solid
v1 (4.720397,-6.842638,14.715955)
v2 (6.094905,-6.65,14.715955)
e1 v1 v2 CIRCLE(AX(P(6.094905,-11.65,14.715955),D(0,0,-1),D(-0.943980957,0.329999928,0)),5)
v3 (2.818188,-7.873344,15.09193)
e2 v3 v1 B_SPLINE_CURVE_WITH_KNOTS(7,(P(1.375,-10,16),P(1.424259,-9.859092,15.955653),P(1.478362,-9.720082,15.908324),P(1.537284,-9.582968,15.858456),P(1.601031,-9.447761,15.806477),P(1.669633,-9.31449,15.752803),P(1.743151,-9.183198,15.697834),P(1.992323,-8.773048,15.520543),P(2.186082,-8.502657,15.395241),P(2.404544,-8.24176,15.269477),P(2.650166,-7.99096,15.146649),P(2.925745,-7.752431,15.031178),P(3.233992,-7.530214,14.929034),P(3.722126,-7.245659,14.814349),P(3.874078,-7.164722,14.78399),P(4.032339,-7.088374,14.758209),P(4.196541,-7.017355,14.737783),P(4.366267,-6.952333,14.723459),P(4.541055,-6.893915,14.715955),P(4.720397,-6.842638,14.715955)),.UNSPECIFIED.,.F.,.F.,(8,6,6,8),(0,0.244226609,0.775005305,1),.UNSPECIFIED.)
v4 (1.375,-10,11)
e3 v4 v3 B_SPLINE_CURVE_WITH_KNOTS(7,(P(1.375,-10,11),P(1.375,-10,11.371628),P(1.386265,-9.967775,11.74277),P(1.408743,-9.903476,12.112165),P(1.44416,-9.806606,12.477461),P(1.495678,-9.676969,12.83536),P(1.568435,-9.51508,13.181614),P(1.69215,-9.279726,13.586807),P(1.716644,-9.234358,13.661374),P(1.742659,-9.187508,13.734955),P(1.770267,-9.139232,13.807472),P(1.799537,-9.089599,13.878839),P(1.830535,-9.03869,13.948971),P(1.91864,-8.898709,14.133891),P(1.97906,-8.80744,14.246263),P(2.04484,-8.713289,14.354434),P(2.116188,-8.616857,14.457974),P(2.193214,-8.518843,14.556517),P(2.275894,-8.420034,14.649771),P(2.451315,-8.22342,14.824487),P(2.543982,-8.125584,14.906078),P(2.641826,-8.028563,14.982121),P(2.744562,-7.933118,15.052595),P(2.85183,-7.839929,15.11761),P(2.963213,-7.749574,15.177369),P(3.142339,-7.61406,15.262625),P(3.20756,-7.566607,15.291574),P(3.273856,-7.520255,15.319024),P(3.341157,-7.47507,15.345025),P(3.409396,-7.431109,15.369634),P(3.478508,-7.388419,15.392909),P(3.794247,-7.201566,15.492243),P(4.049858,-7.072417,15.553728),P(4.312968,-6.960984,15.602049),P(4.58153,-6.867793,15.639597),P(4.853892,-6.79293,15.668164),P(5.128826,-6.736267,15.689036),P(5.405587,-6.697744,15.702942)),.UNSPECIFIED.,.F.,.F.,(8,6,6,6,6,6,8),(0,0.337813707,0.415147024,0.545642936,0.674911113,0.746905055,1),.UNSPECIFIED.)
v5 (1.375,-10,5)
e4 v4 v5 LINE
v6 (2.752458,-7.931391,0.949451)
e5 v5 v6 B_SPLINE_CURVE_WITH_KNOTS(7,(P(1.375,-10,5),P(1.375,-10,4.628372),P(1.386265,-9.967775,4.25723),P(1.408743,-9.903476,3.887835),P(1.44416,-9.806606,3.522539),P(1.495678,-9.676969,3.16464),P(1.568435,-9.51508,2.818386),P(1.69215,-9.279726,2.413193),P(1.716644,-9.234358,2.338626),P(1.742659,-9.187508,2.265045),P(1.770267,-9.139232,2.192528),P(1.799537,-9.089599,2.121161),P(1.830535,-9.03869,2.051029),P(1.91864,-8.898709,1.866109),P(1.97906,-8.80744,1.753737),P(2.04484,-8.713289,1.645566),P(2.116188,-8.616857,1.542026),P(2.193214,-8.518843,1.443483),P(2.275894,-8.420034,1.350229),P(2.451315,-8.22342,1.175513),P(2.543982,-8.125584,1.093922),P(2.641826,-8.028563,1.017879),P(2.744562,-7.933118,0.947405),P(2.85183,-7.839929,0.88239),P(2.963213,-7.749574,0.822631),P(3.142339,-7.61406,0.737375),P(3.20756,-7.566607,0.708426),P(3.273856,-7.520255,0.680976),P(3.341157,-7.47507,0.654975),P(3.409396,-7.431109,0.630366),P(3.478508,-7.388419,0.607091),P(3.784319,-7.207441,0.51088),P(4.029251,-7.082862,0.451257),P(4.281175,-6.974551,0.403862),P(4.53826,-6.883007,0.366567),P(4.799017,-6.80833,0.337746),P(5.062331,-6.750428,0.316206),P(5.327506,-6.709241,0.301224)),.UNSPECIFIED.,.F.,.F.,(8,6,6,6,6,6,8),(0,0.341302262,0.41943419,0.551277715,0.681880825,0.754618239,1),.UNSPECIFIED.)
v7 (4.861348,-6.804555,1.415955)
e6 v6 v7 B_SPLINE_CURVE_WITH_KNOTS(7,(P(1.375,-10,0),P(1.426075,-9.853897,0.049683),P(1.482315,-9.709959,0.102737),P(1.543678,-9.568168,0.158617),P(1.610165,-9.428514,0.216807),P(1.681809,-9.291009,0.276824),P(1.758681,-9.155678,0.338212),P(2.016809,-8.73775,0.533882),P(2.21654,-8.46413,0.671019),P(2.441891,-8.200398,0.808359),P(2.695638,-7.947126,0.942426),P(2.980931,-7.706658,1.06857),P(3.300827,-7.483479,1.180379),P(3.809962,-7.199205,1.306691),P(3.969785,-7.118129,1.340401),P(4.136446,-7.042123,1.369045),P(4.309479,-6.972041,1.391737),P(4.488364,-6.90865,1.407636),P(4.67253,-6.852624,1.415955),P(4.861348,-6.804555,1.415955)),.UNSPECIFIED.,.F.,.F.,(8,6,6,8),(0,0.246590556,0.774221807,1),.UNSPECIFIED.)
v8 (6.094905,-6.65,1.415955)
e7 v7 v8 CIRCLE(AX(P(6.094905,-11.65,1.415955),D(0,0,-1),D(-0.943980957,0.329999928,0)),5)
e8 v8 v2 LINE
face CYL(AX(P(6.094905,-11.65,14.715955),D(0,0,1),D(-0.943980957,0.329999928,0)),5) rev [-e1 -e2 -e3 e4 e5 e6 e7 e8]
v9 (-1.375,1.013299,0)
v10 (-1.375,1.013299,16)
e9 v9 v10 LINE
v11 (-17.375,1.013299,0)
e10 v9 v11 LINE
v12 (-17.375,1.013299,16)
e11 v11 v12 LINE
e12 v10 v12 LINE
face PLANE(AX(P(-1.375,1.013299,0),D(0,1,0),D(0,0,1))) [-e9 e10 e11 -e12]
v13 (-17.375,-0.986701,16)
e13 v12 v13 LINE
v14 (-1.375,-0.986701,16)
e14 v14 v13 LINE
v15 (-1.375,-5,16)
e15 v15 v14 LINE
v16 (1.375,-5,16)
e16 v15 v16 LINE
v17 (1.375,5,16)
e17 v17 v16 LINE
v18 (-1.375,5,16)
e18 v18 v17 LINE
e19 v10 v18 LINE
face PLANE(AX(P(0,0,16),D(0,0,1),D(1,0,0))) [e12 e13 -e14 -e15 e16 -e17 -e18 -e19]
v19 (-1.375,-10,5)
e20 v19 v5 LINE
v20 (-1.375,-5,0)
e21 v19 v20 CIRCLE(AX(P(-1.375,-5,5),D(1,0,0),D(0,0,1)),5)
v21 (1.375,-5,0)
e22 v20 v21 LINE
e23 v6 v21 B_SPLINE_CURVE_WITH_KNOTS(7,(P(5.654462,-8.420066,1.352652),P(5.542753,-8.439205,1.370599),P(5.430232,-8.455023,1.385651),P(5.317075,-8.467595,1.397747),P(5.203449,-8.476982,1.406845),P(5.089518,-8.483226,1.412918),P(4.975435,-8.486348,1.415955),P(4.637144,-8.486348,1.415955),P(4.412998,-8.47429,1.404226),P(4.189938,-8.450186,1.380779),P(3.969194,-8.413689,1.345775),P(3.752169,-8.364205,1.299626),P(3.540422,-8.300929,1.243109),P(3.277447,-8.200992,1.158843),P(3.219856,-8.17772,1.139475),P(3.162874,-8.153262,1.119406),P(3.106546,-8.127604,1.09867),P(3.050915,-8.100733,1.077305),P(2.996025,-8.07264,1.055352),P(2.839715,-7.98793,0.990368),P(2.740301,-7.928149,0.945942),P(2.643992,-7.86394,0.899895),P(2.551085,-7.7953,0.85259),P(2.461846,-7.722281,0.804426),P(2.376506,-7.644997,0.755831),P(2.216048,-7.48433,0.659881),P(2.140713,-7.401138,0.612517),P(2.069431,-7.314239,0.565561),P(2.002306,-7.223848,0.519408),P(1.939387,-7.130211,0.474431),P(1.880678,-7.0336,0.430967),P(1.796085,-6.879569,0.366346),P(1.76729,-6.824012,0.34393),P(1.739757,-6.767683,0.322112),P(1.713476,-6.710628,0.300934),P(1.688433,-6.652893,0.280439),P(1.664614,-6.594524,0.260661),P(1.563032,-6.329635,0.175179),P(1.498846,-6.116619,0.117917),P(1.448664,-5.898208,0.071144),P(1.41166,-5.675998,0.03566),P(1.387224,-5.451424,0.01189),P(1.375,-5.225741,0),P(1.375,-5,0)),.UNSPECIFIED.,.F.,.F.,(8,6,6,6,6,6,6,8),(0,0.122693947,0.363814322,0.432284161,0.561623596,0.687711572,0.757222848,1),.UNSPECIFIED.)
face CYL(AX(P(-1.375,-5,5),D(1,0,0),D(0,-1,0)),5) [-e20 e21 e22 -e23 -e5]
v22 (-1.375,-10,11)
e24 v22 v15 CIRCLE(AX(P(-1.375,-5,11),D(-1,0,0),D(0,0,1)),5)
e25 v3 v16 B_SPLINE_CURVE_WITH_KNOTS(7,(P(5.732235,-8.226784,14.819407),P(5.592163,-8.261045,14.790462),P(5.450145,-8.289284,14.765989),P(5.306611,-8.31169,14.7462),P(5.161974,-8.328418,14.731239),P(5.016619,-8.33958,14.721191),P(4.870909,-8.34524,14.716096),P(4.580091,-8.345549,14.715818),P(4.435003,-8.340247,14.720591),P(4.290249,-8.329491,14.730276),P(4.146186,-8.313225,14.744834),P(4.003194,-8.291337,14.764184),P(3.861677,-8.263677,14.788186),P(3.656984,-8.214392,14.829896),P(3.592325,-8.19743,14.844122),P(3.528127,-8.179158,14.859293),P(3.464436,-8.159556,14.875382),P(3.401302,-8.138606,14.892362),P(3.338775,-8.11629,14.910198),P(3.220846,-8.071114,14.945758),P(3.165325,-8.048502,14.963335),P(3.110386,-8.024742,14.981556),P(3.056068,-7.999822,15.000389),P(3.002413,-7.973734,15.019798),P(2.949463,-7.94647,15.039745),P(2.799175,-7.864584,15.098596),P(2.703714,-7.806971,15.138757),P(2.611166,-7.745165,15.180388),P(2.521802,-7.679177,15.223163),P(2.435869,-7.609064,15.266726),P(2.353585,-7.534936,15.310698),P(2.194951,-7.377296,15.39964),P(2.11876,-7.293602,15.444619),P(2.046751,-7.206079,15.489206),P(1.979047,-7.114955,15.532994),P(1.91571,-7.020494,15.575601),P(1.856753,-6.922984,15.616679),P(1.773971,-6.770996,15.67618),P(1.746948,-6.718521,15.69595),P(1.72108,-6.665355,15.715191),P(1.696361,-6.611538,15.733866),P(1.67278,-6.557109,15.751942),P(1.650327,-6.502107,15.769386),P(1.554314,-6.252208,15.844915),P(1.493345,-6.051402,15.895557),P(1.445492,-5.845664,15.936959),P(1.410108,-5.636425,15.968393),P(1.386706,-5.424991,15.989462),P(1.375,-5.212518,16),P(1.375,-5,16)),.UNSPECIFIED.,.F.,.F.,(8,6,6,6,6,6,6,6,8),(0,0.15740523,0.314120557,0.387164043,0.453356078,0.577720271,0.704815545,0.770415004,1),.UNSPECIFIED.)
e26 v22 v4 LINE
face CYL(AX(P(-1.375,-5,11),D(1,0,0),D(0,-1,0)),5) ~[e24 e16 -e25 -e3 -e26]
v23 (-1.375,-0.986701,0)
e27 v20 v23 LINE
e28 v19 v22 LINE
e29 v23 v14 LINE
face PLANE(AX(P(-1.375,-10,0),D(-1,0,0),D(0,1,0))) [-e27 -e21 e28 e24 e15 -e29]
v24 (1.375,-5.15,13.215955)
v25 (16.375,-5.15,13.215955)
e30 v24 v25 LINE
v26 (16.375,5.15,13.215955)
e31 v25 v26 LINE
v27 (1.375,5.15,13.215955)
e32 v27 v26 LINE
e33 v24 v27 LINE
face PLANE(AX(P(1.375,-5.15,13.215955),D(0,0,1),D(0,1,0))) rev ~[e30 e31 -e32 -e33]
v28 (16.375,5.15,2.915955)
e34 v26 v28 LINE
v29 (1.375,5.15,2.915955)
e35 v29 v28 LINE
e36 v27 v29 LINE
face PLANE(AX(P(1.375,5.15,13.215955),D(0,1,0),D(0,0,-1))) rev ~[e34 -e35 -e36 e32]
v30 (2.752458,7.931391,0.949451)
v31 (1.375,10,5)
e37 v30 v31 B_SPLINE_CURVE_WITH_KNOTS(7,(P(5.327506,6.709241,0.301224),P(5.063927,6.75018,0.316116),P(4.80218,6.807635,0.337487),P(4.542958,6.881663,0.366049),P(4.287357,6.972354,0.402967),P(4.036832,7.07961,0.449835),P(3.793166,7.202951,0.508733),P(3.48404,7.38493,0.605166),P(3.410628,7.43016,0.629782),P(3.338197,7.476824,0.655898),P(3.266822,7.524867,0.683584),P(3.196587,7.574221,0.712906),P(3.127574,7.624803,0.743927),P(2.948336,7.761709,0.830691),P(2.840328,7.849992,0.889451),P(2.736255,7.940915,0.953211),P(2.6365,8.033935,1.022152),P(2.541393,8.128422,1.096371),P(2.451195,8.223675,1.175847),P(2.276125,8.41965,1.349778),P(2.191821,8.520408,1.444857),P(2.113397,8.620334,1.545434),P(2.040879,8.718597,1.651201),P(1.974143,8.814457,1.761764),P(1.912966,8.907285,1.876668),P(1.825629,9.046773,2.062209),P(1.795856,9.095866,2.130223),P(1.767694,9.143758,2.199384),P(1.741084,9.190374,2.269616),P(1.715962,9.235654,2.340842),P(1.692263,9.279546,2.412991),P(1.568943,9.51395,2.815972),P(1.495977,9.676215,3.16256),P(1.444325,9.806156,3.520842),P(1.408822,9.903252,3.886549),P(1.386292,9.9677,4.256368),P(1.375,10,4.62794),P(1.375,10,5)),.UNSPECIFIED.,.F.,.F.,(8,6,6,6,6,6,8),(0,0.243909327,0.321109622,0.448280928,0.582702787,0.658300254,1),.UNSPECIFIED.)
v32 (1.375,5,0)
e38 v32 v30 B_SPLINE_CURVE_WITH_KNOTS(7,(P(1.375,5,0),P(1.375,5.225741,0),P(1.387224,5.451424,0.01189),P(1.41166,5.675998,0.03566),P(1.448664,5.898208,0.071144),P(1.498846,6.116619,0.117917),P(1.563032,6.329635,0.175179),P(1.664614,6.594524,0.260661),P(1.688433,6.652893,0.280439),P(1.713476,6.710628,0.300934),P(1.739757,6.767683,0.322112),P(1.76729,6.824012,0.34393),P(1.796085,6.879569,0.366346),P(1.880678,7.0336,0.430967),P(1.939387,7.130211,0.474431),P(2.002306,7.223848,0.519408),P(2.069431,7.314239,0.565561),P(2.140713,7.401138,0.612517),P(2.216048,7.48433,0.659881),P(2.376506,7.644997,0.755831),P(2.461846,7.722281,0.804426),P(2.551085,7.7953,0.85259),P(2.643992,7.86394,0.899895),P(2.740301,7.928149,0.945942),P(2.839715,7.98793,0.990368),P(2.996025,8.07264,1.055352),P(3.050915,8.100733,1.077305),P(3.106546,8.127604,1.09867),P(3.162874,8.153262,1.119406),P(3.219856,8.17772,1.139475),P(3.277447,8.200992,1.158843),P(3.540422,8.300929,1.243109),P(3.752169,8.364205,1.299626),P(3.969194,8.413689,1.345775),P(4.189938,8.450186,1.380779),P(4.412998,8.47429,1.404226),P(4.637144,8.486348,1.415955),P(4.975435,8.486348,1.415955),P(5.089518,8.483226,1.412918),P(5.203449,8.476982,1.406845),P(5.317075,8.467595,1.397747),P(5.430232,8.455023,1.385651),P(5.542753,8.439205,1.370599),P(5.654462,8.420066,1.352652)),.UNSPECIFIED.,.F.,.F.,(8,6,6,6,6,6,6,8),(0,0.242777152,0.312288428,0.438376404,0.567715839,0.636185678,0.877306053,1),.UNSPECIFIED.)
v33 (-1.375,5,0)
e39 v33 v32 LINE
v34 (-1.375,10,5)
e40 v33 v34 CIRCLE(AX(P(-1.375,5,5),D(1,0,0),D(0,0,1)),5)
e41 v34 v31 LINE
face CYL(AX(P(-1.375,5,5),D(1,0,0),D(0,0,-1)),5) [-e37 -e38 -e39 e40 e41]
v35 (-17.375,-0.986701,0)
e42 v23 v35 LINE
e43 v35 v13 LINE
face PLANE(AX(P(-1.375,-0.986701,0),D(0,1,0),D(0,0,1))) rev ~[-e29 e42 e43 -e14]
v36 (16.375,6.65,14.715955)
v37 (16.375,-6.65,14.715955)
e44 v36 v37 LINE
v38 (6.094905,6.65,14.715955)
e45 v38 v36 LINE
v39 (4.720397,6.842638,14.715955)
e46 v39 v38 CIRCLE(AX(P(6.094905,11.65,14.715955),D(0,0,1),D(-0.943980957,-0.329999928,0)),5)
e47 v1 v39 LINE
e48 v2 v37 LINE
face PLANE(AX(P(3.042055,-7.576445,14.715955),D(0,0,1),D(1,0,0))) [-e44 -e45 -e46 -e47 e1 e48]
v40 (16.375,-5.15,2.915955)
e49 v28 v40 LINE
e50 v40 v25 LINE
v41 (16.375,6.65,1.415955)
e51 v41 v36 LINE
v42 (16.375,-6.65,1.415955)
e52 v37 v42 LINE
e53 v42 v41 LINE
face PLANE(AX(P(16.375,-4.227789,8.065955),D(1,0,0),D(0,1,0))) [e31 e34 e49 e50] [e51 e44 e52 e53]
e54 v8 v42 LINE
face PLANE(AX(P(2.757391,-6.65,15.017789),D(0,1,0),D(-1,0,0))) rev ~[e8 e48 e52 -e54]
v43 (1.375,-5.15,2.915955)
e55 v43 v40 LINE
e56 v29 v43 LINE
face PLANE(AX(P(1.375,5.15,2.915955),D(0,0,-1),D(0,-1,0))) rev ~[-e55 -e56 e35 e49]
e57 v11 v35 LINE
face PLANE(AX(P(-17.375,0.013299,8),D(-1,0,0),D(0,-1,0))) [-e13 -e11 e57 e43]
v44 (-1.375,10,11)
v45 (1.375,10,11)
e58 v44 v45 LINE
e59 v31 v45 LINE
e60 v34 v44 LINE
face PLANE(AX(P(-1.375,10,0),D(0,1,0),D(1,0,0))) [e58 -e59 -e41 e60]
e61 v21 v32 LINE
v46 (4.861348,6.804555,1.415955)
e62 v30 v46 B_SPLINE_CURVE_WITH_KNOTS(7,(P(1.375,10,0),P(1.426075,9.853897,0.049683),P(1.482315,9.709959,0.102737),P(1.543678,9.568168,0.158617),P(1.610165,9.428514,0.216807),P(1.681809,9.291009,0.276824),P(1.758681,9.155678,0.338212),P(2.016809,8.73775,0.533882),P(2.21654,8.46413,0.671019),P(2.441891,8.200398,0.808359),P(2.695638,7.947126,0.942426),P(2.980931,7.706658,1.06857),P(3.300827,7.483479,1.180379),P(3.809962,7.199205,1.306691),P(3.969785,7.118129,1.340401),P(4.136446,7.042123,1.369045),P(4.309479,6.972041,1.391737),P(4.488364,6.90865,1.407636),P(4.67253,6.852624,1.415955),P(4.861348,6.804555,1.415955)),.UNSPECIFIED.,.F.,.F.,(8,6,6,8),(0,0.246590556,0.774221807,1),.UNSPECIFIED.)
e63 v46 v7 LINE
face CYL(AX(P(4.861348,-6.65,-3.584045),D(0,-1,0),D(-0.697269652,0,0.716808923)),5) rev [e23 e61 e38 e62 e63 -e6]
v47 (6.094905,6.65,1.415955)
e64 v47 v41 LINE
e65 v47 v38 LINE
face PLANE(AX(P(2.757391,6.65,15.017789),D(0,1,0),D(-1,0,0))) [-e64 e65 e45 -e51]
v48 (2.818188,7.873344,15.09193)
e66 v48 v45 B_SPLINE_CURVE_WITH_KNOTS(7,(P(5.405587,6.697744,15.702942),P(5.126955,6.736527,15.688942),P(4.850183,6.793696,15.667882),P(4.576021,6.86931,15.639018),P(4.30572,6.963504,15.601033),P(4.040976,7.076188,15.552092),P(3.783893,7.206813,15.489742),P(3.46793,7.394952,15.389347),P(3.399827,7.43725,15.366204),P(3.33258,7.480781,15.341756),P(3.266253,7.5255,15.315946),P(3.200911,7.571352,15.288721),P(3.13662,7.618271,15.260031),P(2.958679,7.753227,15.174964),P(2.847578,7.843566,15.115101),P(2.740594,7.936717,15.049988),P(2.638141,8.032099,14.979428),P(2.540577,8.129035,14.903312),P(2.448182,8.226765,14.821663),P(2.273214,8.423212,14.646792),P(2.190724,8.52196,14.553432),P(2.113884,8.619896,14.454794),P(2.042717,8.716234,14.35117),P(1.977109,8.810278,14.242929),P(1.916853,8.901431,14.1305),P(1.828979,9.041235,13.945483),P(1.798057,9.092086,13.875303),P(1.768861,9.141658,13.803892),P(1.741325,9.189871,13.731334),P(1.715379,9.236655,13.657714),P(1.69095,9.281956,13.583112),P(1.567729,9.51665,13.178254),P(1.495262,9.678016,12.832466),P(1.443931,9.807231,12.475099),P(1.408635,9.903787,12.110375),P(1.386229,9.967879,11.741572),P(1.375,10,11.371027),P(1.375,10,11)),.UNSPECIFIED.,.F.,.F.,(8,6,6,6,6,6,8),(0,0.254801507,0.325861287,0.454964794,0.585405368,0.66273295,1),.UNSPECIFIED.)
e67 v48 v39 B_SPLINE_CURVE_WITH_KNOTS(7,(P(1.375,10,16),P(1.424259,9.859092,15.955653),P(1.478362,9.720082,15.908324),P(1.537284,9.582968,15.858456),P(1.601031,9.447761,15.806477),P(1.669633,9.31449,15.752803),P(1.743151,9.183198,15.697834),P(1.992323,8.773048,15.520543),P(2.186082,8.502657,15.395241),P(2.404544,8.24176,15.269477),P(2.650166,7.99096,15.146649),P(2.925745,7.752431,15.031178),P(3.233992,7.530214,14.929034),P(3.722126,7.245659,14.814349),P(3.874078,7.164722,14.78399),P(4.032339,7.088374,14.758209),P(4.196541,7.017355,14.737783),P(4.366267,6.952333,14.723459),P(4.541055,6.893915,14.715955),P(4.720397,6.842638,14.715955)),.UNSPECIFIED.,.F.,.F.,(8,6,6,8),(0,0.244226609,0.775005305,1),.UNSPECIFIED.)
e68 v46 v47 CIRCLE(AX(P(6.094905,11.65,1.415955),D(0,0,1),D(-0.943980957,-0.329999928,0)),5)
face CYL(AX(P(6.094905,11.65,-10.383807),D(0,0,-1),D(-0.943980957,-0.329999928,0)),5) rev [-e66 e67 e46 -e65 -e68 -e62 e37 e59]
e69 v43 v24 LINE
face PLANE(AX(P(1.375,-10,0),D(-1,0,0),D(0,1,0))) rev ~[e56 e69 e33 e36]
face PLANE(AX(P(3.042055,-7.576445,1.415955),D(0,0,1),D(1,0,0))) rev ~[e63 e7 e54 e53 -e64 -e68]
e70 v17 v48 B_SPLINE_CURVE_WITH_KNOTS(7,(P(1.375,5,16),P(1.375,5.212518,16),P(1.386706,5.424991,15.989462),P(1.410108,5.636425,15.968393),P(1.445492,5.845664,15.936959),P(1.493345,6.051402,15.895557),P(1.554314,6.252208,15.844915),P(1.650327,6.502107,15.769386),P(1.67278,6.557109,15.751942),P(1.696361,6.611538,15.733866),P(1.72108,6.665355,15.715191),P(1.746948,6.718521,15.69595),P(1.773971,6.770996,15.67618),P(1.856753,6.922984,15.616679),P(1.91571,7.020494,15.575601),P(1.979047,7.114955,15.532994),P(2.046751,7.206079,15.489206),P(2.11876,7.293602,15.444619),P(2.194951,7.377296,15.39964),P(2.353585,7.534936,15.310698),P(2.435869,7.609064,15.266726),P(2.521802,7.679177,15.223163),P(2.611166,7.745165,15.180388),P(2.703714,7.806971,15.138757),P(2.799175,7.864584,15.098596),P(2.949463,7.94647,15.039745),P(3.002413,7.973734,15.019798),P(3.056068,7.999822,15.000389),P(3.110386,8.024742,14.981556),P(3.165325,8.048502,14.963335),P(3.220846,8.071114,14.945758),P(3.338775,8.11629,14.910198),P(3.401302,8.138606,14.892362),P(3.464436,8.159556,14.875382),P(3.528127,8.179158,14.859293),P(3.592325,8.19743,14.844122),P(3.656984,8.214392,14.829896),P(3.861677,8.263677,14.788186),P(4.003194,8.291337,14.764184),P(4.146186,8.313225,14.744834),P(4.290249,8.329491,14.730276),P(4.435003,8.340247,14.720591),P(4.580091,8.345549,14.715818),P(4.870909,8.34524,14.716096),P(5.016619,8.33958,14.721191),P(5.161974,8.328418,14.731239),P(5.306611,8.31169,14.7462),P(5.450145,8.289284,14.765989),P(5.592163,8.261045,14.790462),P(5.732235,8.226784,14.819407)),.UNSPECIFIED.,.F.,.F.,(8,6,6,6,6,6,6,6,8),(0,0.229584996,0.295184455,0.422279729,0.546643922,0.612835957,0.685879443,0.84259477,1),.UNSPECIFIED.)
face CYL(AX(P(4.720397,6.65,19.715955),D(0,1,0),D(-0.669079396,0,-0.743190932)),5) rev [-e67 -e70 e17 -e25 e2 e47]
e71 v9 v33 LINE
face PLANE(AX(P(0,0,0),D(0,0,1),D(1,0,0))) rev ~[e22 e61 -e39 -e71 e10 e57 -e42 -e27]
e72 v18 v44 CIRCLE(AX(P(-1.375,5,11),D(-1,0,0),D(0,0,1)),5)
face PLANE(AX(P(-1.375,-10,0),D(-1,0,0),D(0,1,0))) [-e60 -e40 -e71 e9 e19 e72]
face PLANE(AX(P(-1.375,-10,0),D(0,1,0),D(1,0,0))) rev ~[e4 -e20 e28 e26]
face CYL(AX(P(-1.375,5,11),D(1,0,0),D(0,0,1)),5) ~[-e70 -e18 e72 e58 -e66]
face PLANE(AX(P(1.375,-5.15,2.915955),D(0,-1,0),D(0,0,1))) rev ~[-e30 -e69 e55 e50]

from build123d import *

# Parameters (mm, degrees)
F0_W         = 2.75
F0_H         = 20
F1_DEPTH     = 16
F2_W         = 5.15
F2_H         = 10.3
F3_DEPTH     = 2.75
F4_DEPTH     = 15
F5_T1_DEPTH  = 13.2999992773
F5_T3_DEPTH  = 13.2999992773
F5_T9_DEPTH  = 21.6634917276
F5_T14_DEPTH = 25.0997612432
F5_T22_DEPTH = 21.6634917276
F5_T27_DEPTH = 25.0997612432
F5_T35_DEPTH = 22.0158699277
F5_T40_DEPTH = 25.0997612432
F5_T48_DEPTH = 25.0997612432
F5_T53_DEPTH = 22.0158699277
F6_R         = 5
F7_W         = 2
F7_H         = 16
F8_DEPTH     = 16


# Not quite as in the source:
# - a fillet or chamfer that OpenCascade refuses, or shapes differently, is made with other operations: its cross-section is extruded or revolved along the edge and cut away or added
# - a feature names something its author has since deleted; it is built from what else it names


with BuildPart() as f1:
    # F0 (on Top) → F1 (new body)
    with BuildSketch(Plane.XY):
        Rectangle(F0_W, F0_H)
    extrude(amount=F1_DEPTH)

    # F2 (on face) → F3 (join)
    with BuildSketch(Plane.YZ.offset(1.375)):
        Polygon((0, 16), (-10, 16), (-10, 0), (0, 0), (0, 1.4159553841), (-6.6499996386, 1.4159553841), (-6.6499996386, 14.7159546614), (0, 14.7159546614), align=None)
        Polygon((10, 16), (0, 16), (0, 14.7159546614), (6.6499996386, 14.7159546614), (6.6499996386, 1.4159553841), (0, 1.4159553841), (0, 0), (10, 0), align=None)
        with Locations((-2.575, 8.0659550227)):
            Rectangle(F2_W, F2_H)
        with Locations((2.575, 8.0659550227)):
            Rectangle(F2_W, F2_H)
        Polygon((0, 13.2159550227), (0, 14.7159546614), (-6.6499996386, 14.7159546614), (-6.6499996386, 1.4159553841), (0, 1.4159553841), (0, 2.9159550227), (-5.15, 2.9159550227), (-5.15, 13.2159550227), align=None)
        Polygon((6.6499996386, 14.7159546614), (0, 14.7159546614), (0, 13.2159550227), (5.15, 13.2159550227), (5.15, 2.9159550227), (0, 2.9159550227), (0, 1.4159553841), (6.6499996386, 1.4159553841), align=None)
    extrude(amount=-F3_DEPTH)

    # F2 (on face) → F4 (join)
    with BuildSketch(Plane.YZ.offset(1.375)):
        Polygon((0, 13.2159550227), (0, 14.7159546614), (-6.6499996386, 14.7159546614), (-6.6499996386, 1.4159553841), (0, 1.4159553841), (0, 2.9159550227), (-5.15, 2.9159550227), (-5.15, 13.2159550227), align=None)
        Polygon((6.6499996386, 14.7159546614), (0, 14.7159546614), (0, 13.2159550227), (5.15, 13.2159550227), (5.15, 2.9159550227), (0, 2.9159550227), (0, 1.4159553841), (6.6499996386, 1.4159553841), align=None)
    extrude(amount=F4_DEPTH)

    # F5: fillet of radius 5 on 6 edges, made by hand

    # F5_s2 → F5_t1 (join)
    with BuildSketch(Plane.XZ.offset(-6.6499996386)):
        with BuildLine():
            ThreePointArc((1.375, 16), (2.9287180617, 15.0479907955), (4.7203969801, 14.7159546614))
            Line((4.7203969801, 14.7159546614), (1.375, 14.7159546614))
            Line((1.375, 14.7159546614), (1.375, 16))
        make_face()
        with BuildLine():
            ThreePointArc((1.375, 0), (2.9798891295, 1.0484613517), (4.8613482602, 1.4159553841))
            Line((4.8613482602, 1.4159553841), (1.375, 1.4159553841))
            Line((1.375, 1.4159553841), (1.375, 0))
        make_face()
    extrude(amount=F5_T1_DEPTH)

    # F5_s4 → F5_t3 (join)
    with BuildSketch(Plane.XY.offset(1.4159553841)):
        with BuildLine():
            ThreePointArc((1.375, -10), (3.2009454046, -7.5726231419), (6.0949047864, -6.6499996386))
            Line((6.0949047864, -6.6499996386), (1.375, -6.6499996386))
            Line((1.375, -6.6499996386), (1.375, -10))
        make_face()
        with BuildLine():
            ThreePointArc((1.375, 10), (3.2009454046, 7.5726231419), (6.0949047864, 6.6499996386))
            Line((6.0949047864, 6.6499996386), (1.375, 6.6499996386))
            Line((1.375, 6.6499996386), (1.375, 10))
        make_face()
    extrude(amount=F5_T3_DEPTH)


with BuildPart() as f5_tool7:
    # F5_s8 → F5_t9 (new body)
    with BuildSketch(Plane.XZ.offset(-15.013492089)):
        with BuildLine():
            ThreePointArc((1.375, 16), (2.9287180617, 15.0479907955), (4.7203969801, 14.7159546614))
            Line((4.7203969801, 14.7159546614), (1.375, 14.7159546614))
            Line((1.375, 14.7159546614), (1.375, 16))
        make_face()
    extrude(amount=F5_T9_DEPTH)

    split(bisect_by=Plane.XZ.offset(-10), keep=Keep.TOP)

    split(bisect_by=Plane.XZ.offset(-6.6499996386), keep=Keep.BOTTOM)


with BuildPart() as f5_tool12:
    # F5_s13 → F5_t14 (new body)
    with BuildSketch(Plane.XY.offset(1.4159553841)):
        with BuildLine():
            ThreePointArc((1.375, 10), (3.2009454046, 7.5726231419), (6.0949047864, 6.6499996386))
            Line((6.0949047864, 6.6499996386), (1.375, 6.6499996386))
            Line((1.375, 6.6499996386), (1.375, 10))
        make_face()
    extrude(amount=F5_T14_DEPTH)

    split(bisect_by=Plane.XY.offset(16), keep=Keep.BOTTOM)

    split(bisect_by=Plane.XY.offset(14.7159546614), keep=Keep.TOP)


with BuildPart() as f5_tool7_1:
    add(f5_tool7.part)

    # F5_t17: intersect F5_tool12
    add(f5_tool12.part, mode=Mode.INTERSECT)


with BuildPart() as f1_1:
    add(f1.part)

    # F5_t5: union F5_tool7
    add(f5_tool7_1.part)


with BuildPart() as f5_tool20:
    # F5_s21 → F5_t22 (new body)
    with BuildSketch(Plane.XZ.offset(-6.6499996386)):
        with BuildLine():
            ThreePointArc((1.375, 16), (2.9287180617, 15.0479907955), (4.7203969801, 14.7159546614))
            Line((4.7203969801, 14.7159546614), (1.375, 14.7159546614))
            Line((1.375, 14.7159546614), (1.375, 16))
        make_face()
    extrude(amount=F5_T22_DEPTH)

    split(bisect_by=Plane.XZ.offset(10), keep=Keep.BOTTOM)

    split(bisect_by=Plane.XZ.offset(6.6499996386), keep=Keep.TOP)


with BuildPart() as f5_tool25:
    # F5_s26 → F5_t27 (new body)
    with BuildSketch(Plane.XY.offset(26.5157166273)):
        with BuildLine():
            ThreePointArc((1.375, -10), (3.2009454046, -7.5726231419), (6.0949047864, -6.6499996386))
            Line((6.0949047864, -6.6499996386), (1.375, -6.6499996386))
            Line((1.375, -6.6499996386), (1.375, -10))
        make_face()
    extrude(amount=-F5_T27_DEPTH)

    split(bisect_by=Plane.XY.offset(16), keep=Keep.BOTTOM)

    split(bisect_by=Plane.XY.offset(14.7159546614), keep=Keep.TOP)


with BuildPart() as f5_tool20_1:
    add(f5_tool20.part)

    # F5_t30: intersect F5_tool25
    add(f5_tool25.part, mode=Mode.INTERSECT)


with BuildPart() as f1_2:
    add(f1_1.part)

    # F5_t18: union F5_tool20
    add(f5_tool20_1.part)


with BuildPart() as f5_tool33:
    # F5_s34 → F5_t35 (new body)
    with BuildSketch(Plane.XZ.offset(15.365870289)):
        with BuildLine():
            ThreePointArc((1.375, 0), (2.9798891295, 1.0484613517), (4.8613482602, 1.4159553841))
            Line((4.8613482602, 1.4159553841), (1.375, 1.4159553841))
            Line((1.375, 1.4159553841), (1.375, 0))
        make_face()
    extrude(amount=-F5_T35_DEPTH)

    split(bisect_by=Plane.XZ.offset(10), keep=Keep.BOTTOM)

    split(bisect_by=Plane.XZ.offset(6.6499996386), keep=Keep.TOP)


with BuildPart() as f5_tool38:
    # F5_s39 → F5_t40 (new body)
    with BuildSketch(Plane.XY.offset(14.7159546614)):
        with BuildLine():
            ThreePointArc((1.375, -10), (3.2009454046, -7.5726231419), (6.0949047864, -6.6499996386))
            Line((6.0949047864, -6.6499996386), (1.375, -6.6499996386))
            Line((1.375, -6.6499996386), (1.375, -10))
        make_face()
    extrude(amount=-F5_T40_DEPTH)

    split(bisect_by=Plane.XY, keep=Keep.TOP)

    split(bisect_by=Plane.XY.offset(1.4159553841), keep=Keep.BOTTOM)


with BuildPart() as f5_tool33_1:
    add(f5_tool33.part)

    # F5_t43: intersect F5_tool38
    add(f5_tool38.part, mode=Mode.INTERSECT)


with BuildPart() as f1_3:
    add(f1_2.part)

    # F5_t31: union F5_tool33
    add(f5_tool33_1.part)


with BuildPart() as f5_tool46:
    # F5_s47 → F5_t48 (new body)
    with BuildSketch(Plane.XY.offset(-10.3838065819)):
        with BuildLine():
            ThreePointArc((1.375, 10), (3.2009454046, 7.5726231419), (6.0949047864, 6.6499996386))
            Line((6.0949047864, 6.6499996386), (1.375, 6.6499996386))
            Line((1.375, 6.6499996386), (1.375, 10))
        make_face()
    extrude(amount=F5_T48_DEPTH)

    split(bisect_by=Plane.XY, keep=Keep.TOP)

    split(bisect_by=Plane.XY.offset(1.4159553841), keep=Keep.BOTTOM)


with BuildPart() as f5_tool51:
    # F5_s52 → F5_t53 (new body)
    with BuildSketch(Plane.XZ.offset(6.6499996386)):
        with BuildLine():
            ThreePointArc((1.375, 0), (2.9798891295, 1.0484613517), (4.8613482602, 1.4159553841))
            Line((4.8613482602, 1.4159553841), (1.375, 1.4159553841))
            Line((1.375, 1.4159553841), (1.375, 0))
        make_face()
    extrude(amount=-F5_T53_DEPTH)

    split(bisect_by=Plane.XZ.offset(-10), keep=Keep.TOP)

    split(bisect_by=Plane.XZ.offset(-6.6499996386), keep=Keep.BOTTOM)


with BuildPart() as f5_tool46_1:
    add(f5_tool46.part)

    # F5_t56: intersect F5_tool51
    add(f5_tool51.part, mode=Mode.INTERSECT)


with BuildPart() as f1_4:
    add(f1_3.part)

    # F5_t44: union F5_tool46
    add(f5_tool46_1.part)

    # F6
    f6_edges = [f1_4.edges().sort_by_distance(p)[0] for p in [
        (0, -10, 0),
        (0, -10, 16),
        (0, 10, 16),
        (0, 10, 0),
    ]]
    fillet(f6_edges, radius=F6_R)

    # F7 (on face) → F8 (join)
    with BuildSketch(Plane(origin=(-1.375, 0, 0), x_dir=(0, -1, 0), z_dir=(-1, 0, 0))):
        with Locations((-0.0132987518, 8)):
            Rectangle(F7_W, F7_H)
    extrude(amount=F8_DEPTH)


solid = f1_4.part
